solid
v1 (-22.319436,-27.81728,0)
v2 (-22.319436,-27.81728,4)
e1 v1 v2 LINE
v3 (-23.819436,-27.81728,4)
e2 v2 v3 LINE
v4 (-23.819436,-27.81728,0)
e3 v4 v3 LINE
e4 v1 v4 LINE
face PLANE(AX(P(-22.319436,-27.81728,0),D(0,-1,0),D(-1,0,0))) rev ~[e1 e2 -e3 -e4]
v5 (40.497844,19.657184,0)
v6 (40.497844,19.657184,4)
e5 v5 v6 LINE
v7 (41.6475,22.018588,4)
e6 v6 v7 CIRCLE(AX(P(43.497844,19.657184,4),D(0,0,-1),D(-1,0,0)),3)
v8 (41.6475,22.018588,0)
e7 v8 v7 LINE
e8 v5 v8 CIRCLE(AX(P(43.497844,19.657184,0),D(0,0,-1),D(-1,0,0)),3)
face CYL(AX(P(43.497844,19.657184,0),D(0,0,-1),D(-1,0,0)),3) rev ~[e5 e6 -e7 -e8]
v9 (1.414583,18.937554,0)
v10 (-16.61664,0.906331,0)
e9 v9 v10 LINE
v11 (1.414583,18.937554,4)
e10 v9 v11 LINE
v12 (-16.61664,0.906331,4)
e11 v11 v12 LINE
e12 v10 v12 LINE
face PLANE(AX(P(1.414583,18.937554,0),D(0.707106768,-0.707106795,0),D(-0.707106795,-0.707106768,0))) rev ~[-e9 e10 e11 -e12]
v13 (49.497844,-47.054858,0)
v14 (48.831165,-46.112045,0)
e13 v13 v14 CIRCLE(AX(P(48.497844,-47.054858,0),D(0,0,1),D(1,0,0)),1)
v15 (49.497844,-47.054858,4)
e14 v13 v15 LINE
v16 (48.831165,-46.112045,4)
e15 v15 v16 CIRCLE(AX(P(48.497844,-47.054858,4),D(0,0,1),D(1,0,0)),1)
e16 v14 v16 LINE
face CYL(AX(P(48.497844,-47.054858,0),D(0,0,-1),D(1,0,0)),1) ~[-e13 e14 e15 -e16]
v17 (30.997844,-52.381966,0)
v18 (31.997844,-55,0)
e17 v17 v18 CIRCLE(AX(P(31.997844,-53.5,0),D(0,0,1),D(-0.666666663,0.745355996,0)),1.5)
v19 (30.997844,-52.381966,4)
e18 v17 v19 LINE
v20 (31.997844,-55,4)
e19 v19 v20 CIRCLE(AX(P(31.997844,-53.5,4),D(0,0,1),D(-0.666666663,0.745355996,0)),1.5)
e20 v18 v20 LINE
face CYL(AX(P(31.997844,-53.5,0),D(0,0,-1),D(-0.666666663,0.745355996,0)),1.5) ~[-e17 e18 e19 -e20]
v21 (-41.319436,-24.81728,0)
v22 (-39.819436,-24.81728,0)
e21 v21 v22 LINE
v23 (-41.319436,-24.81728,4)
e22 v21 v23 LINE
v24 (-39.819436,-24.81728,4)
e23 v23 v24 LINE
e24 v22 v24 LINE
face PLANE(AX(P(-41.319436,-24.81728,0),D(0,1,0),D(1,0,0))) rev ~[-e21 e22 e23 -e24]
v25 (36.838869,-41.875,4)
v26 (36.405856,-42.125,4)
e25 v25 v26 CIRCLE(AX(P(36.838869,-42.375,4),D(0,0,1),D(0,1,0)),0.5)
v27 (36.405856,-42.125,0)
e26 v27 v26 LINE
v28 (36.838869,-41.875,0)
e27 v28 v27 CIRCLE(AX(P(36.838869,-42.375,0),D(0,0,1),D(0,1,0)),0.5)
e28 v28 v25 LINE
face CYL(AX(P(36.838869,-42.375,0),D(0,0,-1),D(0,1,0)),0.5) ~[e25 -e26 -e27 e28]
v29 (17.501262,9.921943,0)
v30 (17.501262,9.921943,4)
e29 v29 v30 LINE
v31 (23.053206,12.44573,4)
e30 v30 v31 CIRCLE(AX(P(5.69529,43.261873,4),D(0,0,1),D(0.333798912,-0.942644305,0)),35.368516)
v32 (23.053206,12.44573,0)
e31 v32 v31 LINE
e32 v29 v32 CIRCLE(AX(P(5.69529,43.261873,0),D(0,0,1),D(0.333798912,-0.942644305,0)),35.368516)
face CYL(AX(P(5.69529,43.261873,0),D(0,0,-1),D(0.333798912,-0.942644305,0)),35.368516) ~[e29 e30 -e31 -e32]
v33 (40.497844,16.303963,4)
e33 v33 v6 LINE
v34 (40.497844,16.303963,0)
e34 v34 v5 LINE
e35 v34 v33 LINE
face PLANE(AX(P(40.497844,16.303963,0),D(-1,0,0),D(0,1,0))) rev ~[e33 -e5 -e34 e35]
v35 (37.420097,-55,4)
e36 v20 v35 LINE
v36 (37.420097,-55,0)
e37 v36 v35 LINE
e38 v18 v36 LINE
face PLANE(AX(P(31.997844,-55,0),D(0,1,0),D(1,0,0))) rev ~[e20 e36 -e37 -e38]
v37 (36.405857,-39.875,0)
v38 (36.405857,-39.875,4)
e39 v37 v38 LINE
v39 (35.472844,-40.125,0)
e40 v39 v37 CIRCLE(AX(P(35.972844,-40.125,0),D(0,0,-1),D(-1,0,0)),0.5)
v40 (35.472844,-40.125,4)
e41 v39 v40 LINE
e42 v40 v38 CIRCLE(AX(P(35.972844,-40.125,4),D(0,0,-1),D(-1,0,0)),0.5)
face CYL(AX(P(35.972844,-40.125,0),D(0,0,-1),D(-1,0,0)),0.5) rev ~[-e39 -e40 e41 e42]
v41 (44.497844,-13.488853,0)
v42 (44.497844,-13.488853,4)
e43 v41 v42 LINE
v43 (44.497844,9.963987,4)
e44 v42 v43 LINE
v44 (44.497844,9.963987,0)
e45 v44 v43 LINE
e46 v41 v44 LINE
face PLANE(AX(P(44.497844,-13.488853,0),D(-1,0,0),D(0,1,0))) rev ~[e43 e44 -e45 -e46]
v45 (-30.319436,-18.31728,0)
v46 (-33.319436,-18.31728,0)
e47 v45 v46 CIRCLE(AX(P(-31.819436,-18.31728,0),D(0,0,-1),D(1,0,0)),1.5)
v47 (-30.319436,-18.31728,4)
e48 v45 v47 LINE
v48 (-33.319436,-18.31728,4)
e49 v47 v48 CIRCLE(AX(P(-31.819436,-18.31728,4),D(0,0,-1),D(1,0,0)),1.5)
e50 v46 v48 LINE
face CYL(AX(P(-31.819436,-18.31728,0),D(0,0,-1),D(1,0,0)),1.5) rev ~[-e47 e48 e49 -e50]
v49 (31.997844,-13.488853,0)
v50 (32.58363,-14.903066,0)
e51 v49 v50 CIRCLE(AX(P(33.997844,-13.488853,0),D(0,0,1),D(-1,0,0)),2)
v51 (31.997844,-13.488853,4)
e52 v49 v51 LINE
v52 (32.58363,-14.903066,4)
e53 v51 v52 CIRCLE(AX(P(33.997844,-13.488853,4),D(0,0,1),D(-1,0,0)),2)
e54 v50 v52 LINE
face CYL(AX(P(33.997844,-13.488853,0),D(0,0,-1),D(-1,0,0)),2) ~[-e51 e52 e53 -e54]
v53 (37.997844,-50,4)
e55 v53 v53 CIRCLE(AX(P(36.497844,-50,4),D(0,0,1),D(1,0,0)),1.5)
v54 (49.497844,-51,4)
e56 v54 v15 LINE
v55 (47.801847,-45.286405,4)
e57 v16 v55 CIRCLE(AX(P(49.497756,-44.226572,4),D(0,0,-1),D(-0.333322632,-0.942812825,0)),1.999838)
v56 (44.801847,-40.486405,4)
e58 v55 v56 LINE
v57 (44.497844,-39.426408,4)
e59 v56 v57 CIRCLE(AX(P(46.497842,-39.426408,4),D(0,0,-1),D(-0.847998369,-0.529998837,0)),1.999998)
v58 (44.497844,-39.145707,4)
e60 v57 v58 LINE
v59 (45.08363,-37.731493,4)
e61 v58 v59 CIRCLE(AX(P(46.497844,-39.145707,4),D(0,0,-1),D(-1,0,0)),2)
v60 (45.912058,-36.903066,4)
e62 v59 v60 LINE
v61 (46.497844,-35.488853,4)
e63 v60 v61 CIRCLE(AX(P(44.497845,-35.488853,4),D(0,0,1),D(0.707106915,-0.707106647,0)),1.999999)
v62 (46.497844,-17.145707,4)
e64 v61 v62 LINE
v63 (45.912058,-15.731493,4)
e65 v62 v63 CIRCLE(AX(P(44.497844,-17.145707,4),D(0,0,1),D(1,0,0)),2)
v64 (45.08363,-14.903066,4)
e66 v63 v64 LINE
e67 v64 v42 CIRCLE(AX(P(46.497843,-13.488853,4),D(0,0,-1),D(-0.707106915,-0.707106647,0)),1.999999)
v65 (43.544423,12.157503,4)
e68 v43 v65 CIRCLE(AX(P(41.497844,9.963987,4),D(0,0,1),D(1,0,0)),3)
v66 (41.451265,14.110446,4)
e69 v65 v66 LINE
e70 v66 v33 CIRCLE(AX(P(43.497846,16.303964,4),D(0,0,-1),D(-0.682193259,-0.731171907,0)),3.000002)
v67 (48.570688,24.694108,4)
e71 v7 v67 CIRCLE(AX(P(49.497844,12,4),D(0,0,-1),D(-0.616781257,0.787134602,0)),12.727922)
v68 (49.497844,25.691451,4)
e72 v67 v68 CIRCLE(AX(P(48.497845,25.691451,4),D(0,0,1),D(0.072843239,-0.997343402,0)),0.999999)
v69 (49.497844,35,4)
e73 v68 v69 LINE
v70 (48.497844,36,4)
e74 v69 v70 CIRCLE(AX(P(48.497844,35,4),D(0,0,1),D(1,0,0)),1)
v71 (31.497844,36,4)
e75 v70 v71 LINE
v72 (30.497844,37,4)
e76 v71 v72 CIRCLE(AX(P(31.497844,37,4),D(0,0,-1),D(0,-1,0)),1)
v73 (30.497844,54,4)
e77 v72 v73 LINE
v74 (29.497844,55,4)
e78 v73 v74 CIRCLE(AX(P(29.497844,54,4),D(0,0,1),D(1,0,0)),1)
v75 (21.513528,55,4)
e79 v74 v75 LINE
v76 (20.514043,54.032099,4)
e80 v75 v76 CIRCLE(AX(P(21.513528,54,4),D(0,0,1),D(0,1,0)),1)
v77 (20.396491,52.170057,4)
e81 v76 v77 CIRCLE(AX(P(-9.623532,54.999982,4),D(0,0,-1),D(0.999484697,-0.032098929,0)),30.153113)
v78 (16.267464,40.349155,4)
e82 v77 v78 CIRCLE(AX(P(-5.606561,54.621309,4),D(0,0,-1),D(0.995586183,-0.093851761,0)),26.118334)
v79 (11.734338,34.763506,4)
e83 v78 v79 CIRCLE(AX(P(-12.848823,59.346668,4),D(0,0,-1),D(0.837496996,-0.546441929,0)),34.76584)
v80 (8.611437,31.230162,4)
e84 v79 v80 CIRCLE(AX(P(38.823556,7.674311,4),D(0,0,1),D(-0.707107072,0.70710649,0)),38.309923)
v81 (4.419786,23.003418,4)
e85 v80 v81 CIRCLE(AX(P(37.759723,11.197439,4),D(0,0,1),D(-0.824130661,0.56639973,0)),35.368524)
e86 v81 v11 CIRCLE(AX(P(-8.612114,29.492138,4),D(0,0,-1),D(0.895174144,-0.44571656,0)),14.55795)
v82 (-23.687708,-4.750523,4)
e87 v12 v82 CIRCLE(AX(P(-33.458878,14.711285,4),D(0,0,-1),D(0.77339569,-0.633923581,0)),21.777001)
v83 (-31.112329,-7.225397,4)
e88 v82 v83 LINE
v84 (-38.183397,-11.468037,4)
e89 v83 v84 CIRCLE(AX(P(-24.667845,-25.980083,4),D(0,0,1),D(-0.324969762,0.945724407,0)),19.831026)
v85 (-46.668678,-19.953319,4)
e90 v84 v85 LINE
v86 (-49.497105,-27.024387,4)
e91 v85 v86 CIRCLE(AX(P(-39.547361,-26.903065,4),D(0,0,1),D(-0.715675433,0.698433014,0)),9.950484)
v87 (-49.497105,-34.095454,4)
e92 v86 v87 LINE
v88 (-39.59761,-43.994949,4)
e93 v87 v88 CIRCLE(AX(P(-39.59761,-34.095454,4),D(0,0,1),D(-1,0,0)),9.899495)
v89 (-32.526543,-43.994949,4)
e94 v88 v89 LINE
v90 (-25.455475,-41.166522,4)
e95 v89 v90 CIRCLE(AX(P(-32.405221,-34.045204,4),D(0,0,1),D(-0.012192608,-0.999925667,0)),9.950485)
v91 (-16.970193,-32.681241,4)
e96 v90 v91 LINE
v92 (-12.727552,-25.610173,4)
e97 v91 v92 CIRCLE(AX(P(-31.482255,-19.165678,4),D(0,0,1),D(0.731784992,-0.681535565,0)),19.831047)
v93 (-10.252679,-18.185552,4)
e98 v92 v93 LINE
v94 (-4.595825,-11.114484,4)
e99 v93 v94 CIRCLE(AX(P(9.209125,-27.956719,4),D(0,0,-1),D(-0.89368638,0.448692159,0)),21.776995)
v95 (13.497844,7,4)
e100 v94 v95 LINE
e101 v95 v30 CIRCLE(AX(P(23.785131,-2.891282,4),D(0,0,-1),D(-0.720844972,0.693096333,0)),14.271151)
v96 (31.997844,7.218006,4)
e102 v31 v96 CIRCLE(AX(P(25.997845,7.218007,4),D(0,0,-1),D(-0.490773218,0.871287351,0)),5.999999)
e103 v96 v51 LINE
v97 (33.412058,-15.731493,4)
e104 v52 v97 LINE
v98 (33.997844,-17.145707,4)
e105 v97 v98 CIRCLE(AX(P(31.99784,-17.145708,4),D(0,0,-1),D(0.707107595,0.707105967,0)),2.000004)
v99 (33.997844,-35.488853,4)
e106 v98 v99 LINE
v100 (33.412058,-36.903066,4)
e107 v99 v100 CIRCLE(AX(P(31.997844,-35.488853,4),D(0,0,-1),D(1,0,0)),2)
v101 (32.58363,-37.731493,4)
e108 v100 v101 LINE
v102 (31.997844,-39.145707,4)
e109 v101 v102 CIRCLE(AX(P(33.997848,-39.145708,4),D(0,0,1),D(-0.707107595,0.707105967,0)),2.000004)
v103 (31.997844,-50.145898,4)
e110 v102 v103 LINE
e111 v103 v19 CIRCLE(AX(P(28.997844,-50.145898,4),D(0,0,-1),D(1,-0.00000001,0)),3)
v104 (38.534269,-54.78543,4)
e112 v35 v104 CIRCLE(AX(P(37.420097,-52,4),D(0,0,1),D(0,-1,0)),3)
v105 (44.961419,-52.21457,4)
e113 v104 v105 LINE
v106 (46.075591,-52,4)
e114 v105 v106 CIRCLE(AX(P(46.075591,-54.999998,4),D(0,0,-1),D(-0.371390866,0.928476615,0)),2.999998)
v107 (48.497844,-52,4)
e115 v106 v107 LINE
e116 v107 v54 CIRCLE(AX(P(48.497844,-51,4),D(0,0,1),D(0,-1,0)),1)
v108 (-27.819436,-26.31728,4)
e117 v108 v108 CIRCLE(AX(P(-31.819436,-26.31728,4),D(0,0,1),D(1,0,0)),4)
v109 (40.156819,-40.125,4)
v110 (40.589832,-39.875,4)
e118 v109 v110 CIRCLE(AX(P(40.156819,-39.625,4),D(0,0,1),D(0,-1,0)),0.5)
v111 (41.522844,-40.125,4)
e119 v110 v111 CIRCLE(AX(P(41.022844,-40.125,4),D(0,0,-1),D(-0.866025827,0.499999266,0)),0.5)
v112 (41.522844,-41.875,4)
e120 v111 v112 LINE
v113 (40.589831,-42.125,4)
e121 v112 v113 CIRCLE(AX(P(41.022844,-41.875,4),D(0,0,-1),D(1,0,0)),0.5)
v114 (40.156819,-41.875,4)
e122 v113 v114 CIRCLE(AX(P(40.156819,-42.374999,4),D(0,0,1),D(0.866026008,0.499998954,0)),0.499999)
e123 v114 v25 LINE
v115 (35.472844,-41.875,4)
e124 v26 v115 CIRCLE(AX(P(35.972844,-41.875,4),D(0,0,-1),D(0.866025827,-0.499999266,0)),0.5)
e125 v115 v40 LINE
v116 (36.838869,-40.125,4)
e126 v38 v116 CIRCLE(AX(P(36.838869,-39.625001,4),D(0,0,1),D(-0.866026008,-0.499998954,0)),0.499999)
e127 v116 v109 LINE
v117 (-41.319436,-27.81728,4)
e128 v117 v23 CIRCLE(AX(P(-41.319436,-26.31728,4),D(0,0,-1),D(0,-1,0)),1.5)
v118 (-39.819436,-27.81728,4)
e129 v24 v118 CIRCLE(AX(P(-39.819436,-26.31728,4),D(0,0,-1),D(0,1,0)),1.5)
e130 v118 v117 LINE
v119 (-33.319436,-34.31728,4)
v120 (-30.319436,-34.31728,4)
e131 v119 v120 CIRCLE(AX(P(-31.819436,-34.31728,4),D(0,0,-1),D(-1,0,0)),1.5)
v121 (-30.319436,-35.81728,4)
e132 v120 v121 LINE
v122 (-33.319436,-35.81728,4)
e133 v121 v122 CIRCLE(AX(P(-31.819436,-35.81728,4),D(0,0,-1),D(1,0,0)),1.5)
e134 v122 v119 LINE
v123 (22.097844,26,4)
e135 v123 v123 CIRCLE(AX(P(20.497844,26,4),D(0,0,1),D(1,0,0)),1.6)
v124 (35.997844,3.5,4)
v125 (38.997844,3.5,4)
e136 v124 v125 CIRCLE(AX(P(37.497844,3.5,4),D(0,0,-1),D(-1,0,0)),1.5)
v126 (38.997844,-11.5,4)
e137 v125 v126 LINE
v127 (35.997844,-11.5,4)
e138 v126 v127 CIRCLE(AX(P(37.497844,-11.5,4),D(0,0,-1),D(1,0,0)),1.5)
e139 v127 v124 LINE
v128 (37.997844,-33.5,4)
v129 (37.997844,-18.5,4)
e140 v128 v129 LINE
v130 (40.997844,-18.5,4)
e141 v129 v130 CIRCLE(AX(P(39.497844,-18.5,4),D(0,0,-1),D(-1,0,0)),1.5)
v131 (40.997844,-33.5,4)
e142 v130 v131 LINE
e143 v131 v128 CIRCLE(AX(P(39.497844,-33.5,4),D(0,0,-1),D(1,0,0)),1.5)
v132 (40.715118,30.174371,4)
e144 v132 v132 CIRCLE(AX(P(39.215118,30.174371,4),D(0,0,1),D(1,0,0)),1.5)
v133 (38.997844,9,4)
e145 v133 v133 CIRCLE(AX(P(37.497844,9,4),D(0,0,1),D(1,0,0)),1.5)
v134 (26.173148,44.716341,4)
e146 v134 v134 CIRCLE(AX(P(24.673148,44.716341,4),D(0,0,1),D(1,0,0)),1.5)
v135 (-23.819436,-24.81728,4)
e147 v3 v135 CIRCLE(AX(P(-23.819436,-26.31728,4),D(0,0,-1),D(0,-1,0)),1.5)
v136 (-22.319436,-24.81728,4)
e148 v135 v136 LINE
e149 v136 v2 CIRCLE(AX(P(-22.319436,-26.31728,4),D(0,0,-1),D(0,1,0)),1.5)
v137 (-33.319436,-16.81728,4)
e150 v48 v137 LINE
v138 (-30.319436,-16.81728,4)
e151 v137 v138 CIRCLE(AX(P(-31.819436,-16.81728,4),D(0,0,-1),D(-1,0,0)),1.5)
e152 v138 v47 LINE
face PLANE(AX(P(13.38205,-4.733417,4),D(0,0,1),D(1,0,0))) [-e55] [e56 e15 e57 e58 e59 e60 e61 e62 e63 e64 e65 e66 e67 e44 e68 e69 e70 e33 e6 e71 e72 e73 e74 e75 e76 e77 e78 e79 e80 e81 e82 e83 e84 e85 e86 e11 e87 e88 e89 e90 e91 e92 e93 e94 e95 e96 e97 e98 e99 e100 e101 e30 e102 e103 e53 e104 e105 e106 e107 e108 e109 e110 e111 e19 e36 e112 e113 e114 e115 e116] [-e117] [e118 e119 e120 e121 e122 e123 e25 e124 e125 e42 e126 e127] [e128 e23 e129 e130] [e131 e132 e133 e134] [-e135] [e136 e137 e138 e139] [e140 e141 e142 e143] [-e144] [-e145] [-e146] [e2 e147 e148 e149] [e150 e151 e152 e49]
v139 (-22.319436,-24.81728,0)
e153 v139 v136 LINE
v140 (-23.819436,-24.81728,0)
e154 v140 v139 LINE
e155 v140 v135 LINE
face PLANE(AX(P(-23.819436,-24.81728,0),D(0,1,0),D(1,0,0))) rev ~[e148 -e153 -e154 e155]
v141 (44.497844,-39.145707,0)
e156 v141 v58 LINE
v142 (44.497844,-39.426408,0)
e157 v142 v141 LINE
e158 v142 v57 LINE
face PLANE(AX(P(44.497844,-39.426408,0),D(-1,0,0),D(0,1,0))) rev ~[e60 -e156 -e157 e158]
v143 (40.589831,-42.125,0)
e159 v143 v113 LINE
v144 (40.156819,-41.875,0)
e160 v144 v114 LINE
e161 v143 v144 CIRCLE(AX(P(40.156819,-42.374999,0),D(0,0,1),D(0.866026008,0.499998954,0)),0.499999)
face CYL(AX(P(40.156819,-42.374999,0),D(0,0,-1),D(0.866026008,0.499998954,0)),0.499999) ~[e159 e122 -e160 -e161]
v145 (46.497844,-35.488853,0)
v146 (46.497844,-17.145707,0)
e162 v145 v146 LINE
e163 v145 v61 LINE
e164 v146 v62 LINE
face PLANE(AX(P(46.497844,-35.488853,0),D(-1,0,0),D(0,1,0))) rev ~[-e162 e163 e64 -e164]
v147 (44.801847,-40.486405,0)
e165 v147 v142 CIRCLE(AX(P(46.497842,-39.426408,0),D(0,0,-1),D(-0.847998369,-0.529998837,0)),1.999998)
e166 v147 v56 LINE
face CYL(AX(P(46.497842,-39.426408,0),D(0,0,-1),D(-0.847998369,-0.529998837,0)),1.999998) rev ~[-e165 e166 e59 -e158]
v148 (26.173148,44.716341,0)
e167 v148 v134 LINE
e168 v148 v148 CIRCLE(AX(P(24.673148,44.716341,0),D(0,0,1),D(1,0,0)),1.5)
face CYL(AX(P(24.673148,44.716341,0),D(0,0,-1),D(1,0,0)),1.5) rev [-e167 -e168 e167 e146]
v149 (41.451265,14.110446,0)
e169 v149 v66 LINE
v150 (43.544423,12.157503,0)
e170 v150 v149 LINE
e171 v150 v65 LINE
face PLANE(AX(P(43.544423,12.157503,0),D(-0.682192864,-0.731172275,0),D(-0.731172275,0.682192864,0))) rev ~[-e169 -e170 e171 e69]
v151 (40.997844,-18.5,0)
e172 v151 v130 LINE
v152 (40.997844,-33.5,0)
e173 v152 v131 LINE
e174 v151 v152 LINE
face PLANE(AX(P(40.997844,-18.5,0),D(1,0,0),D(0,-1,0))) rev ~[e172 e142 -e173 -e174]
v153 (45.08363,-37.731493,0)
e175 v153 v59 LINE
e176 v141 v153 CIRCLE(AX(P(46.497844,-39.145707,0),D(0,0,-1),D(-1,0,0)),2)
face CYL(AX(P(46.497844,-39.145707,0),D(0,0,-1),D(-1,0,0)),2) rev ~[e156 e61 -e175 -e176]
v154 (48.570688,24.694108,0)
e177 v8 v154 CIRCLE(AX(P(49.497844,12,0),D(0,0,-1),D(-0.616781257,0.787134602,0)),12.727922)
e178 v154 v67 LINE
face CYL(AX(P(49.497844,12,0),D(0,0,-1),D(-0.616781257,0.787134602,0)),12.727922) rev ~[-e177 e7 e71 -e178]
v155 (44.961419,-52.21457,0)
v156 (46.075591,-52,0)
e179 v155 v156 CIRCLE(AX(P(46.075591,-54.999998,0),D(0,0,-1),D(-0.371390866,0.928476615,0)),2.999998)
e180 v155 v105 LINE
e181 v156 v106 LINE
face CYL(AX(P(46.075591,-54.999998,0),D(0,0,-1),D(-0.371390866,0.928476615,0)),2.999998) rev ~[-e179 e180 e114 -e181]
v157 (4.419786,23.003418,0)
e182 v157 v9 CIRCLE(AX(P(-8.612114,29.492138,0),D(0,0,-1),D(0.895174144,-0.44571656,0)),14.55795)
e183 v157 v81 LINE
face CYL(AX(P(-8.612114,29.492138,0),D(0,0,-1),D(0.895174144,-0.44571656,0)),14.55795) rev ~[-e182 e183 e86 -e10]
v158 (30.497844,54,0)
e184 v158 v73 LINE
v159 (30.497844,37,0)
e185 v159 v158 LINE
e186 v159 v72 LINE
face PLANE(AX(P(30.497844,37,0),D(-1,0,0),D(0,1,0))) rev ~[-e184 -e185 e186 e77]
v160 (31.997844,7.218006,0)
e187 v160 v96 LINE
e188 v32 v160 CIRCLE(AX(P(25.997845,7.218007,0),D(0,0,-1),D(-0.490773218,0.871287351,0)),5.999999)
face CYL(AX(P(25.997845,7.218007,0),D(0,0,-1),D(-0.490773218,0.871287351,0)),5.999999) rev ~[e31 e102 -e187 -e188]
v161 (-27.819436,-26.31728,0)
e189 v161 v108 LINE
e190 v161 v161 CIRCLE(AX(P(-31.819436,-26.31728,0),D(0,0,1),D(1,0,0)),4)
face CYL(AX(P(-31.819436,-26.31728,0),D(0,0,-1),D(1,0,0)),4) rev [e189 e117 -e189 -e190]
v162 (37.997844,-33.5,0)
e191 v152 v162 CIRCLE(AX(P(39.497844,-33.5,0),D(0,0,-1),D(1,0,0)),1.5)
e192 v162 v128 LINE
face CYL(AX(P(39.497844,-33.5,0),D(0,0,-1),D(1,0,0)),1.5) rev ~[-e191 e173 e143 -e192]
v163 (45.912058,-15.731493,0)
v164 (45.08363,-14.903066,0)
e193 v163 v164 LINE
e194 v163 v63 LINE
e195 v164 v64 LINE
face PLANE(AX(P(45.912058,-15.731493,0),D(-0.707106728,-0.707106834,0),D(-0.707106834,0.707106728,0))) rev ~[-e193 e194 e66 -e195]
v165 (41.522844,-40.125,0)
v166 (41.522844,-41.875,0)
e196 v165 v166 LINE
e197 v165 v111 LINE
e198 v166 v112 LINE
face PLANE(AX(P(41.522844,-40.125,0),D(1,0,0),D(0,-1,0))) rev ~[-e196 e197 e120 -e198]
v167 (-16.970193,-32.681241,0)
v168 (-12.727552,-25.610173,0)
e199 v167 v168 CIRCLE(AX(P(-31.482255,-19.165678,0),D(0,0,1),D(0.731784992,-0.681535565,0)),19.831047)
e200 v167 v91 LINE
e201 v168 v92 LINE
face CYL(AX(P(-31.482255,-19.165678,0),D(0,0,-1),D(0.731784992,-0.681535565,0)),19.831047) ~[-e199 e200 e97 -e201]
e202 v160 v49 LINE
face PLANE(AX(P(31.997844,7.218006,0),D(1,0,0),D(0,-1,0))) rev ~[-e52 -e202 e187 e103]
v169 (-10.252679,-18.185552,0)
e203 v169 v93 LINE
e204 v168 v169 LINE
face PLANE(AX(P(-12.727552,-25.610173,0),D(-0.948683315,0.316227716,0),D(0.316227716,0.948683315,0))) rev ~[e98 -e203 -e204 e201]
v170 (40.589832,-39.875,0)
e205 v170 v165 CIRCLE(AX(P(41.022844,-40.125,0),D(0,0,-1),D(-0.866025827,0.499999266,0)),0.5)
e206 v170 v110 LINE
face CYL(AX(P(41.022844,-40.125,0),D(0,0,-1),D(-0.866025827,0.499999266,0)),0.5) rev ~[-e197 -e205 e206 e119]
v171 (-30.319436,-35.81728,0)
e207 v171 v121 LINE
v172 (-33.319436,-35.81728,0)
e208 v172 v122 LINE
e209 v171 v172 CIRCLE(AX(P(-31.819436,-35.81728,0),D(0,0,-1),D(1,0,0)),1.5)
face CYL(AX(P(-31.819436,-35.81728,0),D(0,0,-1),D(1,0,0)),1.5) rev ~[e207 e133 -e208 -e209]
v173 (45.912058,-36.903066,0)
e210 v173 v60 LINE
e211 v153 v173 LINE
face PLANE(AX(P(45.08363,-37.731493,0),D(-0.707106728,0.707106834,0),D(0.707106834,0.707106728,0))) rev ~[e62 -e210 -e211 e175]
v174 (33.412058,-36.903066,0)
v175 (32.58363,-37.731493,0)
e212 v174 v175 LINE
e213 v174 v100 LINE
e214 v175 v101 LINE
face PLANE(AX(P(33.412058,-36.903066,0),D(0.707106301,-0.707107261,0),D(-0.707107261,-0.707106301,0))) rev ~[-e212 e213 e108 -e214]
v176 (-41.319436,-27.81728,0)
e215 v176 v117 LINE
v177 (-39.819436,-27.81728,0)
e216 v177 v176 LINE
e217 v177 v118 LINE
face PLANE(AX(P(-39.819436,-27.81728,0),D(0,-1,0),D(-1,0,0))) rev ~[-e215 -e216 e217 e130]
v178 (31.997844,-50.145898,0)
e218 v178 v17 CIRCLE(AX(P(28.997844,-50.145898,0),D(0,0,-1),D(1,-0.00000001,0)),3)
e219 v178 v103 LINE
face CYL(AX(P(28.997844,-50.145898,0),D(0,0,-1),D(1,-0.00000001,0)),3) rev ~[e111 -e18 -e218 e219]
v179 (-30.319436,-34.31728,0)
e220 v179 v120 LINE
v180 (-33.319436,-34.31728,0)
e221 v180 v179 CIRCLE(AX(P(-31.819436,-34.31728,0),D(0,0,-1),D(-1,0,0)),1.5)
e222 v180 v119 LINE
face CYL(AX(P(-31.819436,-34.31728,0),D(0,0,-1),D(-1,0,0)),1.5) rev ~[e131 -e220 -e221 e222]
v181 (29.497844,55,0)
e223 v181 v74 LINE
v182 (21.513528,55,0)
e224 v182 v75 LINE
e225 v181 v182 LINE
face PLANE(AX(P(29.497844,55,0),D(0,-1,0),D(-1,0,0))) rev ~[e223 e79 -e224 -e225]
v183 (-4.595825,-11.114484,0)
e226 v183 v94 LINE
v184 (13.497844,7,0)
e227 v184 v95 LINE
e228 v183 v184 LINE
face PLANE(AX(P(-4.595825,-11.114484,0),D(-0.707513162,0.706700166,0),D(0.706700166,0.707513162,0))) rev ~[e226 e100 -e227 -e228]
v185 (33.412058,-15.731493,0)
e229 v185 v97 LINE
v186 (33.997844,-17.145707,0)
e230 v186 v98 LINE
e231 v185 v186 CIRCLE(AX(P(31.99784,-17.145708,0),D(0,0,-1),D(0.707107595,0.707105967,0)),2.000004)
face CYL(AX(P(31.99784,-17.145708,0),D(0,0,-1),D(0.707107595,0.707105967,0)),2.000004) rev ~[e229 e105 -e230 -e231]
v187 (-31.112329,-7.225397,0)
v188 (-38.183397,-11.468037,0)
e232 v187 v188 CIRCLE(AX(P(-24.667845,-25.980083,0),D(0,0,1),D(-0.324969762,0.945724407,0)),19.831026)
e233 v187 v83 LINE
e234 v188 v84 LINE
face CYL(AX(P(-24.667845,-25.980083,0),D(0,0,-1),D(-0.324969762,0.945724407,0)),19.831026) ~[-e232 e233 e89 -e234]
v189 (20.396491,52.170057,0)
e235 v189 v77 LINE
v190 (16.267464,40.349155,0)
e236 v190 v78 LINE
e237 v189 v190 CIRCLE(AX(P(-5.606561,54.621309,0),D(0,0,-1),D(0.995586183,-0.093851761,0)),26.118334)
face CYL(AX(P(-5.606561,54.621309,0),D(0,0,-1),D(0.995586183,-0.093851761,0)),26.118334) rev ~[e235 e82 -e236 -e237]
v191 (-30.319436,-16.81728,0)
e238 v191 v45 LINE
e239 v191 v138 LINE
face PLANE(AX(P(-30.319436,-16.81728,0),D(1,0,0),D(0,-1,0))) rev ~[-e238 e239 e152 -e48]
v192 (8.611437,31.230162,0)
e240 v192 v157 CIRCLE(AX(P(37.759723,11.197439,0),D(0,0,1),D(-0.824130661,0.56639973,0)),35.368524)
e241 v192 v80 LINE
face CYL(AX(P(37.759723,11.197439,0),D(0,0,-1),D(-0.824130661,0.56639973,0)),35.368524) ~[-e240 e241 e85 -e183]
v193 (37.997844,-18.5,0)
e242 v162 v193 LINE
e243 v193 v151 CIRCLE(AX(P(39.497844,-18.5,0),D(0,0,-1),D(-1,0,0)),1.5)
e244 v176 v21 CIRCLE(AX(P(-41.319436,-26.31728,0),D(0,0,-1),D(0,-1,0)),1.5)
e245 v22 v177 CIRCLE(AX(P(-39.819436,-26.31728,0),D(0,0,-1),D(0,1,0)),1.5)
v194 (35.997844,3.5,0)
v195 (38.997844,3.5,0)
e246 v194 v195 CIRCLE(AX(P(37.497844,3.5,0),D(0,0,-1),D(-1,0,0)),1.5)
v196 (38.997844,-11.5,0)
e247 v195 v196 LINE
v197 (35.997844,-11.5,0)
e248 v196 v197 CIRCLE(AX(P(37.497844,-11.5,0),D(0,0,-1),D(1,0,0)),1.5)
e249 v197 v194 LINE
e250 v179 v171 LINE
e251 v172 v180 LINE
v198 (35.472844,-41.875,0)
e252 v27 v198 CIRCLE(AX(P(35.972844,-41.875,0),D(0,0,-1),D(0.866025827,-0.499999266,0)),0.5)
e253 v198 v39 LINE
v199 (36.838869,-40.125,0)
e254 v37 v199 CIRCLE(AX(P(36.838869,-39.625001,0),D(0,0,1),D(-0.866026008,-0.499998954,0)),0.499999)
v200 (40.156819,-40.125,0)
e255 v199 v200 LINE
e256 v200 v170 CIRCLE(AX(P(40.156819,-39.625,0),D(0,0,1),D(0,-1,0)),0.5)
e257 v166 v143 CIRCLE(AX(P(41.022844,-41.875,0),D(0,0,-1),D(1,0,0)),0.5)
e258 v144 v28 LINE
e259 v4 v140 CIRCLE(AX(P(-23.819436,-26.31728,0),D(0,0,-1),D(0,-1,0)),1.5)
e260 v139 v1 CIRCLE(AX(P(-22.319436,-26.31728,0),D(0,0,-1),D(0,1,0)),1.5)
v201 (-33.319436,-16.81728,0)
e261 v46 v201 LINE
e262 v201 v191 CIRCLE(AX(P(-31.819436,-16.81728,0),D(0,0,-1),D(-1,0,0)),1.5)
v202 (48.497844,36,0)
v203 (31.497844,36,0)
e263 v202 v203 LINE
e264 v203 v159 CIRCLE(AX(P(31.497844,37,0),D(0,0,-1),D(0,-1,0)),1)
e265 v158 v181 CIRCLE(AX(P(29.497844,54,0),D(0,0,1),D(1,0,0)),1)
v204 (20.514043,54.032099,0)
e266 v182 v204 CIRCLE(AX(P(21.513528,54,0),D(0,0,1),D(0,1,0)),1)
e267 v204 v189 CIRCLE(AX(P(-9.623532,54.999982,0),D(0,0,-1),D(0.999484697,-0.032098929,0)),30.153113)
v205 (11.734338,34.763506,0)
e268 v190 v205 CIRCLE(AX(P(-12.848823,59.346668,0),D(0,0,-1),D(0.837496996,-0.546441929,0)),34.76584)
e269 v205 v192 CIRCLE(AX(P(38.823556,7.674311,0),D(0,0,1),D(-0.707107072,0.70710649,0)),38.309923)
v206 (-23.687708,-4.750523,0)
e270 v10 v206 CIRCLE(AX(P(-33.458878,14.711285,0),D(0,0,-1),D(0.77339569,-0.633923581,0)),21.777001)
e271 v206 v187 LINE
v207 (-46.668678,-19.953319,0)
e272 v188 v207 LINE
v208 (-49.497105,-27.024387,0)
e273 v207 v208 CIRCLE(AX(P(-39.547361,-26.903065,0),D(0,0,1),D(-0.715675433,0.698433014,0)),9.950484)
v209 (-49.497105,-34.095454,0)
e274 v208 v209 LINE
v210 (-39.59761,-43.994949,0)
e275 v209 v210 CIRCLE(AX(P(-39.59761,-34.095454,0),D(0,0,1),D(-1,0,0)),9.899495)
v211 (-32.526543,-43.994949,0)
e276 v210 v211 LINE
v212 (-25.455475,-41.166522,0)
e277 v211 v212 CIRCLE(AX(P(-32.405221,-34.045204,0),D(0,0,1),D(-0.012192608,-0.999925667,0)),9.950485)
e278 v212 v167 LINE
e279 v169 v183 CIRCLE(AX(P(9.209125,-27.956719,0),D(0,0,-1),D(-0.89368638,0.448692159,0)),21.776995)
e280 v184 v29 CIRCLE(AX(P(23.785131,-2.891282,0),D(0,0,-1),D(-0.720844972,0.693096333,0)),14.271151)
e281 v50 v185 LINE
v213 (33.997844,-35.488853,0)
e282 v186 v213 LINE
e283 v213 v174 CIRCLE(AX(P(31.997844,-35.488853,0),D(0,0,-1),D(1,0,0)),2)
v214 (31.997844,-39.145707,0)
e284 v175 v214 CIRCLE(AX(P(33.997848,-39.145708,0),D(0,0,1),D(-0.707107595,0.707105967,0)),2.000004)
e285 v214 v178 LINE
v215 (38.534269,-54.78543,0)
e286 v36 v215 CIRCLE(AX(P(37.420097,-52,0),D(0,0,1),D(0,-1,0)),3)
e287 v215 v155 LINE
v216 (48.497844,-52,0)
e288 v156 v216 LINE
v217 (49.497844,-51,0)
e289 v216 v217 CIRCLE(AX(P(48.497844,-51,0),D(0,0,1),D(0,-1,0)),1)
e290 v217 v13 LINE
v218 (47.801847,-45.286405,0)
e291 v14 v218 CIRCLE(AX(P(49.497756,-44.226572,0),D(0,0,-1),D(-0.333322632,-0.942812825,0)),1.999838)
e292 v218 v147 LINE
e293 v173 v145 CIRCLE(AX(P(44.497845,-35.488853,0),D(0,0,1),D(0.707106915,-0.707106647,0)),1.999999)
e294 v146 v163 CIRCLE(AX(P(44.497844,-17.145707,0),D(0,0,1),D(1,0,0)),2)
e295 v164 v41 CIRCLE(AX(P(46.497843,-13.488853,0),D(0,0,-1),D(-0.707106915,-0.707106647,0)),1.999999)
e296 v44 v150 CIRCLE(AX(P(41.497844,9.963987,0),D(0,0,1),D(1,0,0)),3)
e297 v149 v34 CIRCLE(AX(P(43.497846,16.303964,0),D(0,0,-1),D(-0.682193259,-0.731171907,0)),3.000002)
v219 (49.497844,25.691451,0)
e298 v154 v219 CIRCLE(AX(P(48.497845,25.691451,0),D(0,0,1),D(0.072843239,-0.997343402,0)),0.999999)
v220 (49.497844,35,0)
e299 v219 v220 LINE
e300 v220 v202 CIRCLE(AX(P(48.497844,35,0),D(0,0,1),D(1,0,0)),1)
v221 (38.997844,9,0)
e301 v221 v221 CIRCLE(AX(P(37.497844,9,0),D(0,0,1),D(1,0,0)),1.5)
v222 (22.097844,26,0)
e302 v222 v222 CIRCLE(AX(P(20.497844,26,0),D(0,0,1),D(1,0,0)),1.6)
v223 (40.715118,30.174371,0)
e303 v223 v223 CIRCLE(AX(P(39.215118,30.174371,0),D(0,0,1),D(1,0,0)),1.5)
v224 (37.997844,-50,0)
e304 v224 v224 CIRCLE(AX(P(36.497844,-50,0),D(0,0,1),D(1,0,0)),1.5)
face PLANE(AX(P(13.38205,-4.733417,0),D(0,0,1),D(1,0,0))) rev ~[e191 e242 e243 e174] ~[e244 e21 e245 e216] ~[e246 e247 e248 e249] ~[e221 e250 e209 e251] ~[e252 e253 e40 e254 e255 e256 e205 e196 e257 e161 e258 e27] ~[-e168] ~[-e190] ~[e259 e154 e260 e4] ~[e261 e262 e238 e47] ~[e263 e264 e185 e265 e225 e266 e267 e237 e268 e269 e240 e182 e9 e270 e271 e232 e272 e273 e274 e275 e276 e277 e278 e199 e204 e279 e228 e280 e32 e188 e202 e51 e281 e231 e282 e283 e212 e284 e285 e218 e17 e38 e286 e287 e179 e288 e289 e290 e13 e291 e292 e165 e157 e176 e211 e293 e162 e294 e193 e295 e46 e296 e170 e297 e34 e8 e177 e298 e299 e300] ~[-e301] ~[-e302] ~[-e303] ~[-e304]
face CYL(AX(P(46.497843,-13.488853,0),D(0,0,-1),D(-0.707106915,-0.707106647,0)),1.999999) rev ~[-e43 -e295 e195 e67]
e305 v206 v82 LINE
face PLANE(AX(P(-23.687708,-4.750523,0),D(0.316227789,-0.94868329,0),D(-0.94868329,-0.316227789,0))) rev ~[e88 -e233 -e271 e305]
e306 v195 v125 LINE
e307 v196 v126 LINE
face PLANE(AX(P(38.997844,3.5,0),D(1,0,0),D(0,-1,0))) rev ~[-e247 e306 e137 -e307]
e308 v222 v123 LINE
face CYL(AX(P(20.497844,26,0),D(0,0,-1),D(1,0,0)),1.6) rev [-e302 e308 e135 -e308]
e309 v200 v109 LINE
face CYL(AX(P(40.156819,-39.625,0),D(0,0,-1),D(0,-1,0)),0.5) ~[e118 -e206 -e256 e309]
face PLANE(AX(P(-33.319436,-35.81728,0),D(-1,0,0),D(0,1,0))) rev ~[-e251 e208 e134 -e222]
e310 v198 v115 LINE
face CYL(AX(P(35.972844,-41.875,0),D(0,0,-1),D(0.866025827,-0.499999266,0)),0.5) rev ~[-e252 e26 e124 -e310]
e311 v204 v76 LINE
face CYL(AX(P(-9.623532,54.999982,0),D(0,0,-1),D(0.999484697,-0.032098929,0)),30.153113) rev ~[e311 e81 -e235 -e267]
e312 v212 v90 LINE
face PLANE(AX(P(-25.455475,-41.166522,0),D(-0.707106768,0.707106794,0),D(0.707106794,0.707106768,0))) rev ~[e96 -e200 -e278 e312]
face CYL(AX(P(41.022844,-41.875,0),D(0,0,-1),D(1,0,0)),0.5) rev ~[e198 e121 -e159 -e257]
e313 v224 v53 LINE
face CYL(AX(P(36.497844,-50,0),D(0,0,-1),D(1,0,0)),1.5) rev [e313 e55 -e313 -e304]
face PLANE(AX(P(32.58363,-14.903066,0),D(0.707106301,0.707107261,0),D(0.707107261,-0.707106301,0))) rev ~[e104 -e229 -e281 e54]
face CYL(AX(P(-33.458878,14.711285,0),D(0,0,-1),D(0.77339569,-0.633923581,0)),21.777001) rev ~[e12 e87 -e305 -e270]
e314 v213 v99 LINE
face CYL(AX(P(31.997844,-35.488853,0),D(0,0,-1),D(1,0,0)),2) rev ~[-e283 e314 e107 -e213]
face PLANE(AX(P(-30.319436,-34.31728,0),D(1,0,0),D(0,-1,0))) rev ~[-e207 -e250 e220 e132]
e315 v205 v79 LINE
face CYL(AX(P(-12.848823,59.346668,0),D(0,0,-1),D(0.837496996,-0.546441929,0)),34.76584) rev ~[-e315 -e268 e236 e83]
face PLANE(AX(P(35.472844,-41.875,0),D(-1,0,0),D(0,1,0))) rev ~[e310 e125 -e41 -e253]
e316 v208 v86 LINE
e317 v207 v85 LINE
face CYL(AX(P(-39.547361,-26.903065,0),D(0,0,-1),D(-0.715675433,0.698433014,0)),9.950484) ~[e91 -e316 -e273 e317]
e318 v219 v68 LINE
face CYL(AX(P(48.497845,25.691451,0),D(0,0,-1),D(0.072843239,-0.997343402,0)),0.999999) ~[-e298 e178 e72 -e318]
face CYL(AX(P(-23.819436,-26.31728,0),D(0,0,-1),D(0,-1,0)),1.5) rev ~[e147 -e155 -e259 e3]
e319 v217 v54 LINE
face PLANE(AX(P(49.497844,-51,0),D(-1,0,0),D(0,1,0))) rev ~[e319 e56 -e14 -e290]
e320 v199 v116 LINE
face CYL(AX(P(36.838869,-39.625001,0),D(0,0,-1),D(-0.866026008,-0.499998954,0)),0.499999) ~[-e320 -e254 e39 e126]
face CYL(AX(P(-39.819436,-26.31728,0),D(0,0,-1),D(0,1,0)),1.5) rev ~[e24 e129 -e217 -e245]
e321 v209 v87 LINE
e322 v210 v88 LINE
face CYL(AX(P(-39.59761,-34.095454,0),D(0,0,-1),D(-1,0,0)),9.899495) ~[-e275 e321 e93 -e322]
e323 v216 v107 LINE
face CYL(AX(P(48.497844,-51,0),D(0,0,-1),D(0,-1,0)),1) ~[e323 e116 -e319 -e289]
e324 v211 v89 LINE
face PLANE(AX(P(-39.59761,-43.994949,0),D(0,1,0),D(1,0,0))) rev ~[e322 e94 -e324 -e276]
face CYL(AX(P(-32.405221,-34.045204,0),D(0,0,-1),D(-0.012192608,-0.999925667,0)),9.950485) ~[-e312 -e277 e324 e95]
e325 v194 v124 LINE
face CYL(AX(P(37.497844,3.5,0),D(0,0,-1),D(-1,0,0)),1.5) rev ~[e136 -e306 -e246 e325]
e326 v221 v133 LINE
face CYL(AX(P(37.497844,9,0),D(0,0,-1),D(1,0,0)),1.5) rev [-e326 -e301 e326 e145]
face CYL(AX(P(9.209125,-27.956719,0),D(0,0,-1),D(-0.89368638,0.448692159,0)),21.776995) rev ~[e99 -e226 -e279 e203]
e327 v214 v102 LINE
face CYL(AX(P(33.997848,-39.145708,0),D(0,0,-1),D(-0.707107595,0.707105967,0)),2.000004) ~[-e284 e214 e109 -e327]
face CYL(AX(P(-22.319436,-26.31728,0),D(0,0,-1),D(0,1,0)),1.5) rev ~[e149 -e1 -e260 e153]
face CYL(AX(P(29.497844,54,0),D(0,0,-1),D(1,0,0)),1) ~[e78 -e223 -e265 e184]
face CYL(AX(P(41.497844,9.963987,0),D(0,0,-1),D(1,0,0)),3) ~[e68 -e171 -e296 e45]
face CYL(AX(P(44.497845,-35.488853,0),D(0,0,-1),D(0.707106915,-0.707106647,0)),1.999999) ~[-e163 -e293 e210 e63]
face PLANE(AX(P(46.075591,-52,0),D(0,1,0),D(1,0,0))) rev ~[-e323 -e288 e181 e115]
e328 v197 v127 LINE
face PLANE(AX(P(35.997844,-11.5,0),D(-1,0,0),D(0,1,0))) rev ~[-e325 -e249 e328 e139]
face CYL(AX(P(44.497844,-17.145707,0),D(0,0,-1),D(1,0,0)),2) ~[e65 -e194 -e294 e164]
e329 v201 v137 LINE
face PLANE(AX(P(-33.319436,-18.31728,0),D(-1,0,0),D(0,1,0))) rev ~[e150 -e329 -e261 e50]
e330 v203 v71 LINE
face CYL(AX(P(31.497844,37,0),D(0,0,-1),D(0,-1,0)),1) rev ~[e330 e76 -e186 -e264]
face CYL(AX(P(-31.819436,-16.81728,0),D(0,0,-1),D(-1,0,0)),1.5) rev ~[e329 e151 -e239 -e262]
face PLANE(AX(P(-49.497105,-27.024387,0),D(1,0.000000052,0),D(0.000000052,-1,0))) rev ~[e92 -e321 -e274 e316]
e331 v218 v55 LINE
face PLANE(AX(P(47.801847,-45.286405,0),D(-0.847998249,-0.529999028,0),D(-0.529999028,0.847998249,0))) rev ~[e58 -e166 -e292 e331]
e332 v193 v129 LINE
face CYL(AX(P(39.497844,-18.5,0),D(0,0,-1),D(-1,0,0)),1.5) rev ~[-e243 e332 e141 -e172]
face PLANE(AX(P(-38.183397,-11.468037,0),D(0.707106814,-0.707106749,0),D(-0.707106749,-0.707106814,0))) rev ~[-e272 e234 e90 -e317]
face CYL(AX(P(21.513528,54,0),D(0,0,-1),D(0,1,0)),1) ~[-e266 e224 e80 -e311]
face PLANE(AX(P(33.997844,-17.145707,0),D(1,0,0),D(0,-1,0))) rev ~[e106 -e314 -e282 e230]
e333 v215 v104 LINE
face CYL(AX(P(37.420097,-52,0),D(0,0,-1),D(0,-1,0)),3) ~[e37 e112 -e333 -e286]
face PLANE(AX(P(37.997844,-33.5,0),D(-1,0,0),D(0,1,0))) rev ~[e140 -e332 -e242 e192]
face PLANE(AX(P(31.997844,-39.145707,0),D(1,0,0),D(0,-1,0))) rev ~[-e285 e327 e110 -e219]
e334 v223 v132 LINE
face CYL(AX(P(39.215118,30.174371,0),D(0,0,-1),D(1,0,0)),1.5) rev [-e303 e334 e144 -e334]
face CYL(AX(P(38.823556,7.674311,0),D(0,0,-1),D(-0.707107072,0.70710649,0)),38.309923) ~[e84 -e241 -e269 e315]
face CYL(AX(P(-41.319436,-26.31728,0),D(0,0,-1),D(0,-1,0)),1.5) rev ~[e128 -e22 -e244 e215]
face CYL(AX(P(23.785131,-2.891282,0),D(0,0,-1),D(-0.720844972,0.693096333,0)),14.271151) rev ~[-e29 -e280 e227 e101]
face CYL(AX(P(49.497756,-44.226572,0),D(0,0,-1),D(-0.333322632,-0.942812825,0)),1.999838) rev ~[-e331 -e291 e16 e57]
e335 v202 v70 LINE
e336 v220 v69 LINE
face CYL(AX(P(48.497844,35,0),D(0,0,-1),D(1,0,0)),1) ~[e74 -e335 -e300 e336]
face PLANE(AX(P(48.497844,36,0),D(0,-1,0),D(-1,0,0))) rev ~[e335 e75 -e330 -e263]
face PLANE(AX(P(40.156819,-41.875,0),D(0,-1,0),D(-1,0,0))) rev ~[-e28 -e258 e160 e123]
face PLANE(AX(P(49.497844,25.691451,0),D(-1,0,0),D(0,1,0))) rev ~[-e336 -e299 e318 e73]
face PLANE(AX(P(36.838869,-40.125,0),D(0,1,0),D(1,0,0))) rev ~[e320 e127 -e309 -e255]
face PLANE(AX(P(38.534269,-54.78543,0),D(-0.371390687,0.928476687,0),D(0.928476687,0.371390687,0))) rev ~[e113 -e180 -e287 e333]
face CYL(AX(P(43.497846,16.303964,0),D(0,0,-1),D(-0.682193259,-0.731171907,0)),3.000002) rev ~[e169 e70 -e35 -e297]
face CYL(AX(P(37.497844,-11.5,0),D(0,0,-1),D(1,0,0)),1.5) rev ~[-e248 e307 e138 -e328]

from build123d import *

# Parameters (mm, degrees)
F0_R     = 4
F0_R_2   = 1.5
F0_R_3   = 1.6
F1_DEPTH = 4


# Not quite as in the source:
# - ends of sketch curves that miss each other by under 0.0002 mm in the source are joined


with BuildPart() as f1:
    # F0 (on Top) → F1 (new body)
    with BuildSketch(Plane.XY):
        with BuildLine():
            ThreePointArc((30.9978440056, -52.3819660063), (30.5965854602, -54.0352331312), (31.997844, -55))
            Line((31.997844, -55), (37.420097, -55))
            ThreePointArc((37.420097, -55), (37.9874195635, -54.9458691602), (38.5342690291, -54.7854300727))
            Line((38.5342690291, -54.7854300727), (44.961419, -52.21457))
            ThreePointArc((44.961419, -52.21457), (45.5082684365, -52.0541308398), (46.075591, -52))
            Line((46.075591, -52), (48.497844, -52))
            ThreePointArc((48.497844, -52), (49.2049507812, -51.7071067812), (49.497844, -51))
            Line((49.497844, -51), (49.497844, -47.054858))
            ThreePointArc((49.497844, -47.054858), (49.3143367471, -46.477502309), (48.8311648121, -46.1120445316))
            ThreePointArc((48.8311648121, -46.1120445316), (48.2464480359, -45.7865652768), (47.8018474974, -45.2864046891))
            Line((47.8018474974, -45.2864046891), (44.801847, -40.486405))
            ThreePointArc((44.801847, -40.486405), (44.5753463762, -39.9777725676), (44.497844, -39.426408))
            Line((44.497844, -39.426408), (44.497844, -39.145707))
            ThreePointArc((44.497844, -39.145707), (44.650084935, -38.3803401353), (45.0836304376, -37.7314934376))
            Line((45.0836304376, -37.7314934376), (45.912058, -36.903066))
            ThreePointArc((45.912058, -36.903066), (46.3456032003, -36.2542195381), (46.497844, -35.488853))
            Line((46.497844, -35.488853), (46.497844, -17.145707))
            ThreePointArc((46.497844, -17.145707), (46.345603065, -16.3803401353), (45.9120575624, -15.7314934376))
            Line((45.9120575624, -15.7314934376), (45.08363, -14.903066))
            ThreePointArc((45.08363, -14.903066), (44.6500847997, -14.2542195381), (44.497844, -13.488853))
            Line((44.497844, -13.488853), (44.497844, 9.963987))
            ThreePointArc((44.497844, 9.963987), (44.2491834617, 11.1598679166), (43.5444232222, 12.1575032382))
            Line((43.5444232222, 12.1575032382), (41.451265, 14.110446))
            ThreePointArc((41.451265, 14.110446), (40.7465046743, 15.1080817706), (40.497844, 16.303963))
            Line((40.497844, 16.303963), (40.497844, 19.657184))
            ThreePointArc((40.497844, 19.657184), (40.8005276064, 20.970380205), (41.6475001819, 22.0185877679))
            ThreePointArc((41.6475001819, 22.0185877679), (44.9097367641, 23.8722057946), (48.5706879935, 24.6941080891))
            ThreePointArc((48.5706879935, 24.6941080891), (49.2302523646, 25.0105853837), (49.497844, 25.691451))
            Line((49.497844, 25.691451), (49.497844, 35))
            ThreePointArc((49.497844, 35), (49.2049507812, 35.7071067812), (48.497844, 36))
            Line((48.497844, 36), (31.497844, 36))
            ThreePointArc((31.497844, 36), (30.7907372188, 36.2928932188), (30.497844, 37))
            Line((30.497844, 37), (30.497844, 54))
            ThreePointArc((30.497844, 54), (30.2049507812, 54.7071067812), (29.497844, 55))
            Line((29.497844, 55), (21.513528, 55))
            ThreePointArc((21.513528, 55), (20.8178624993, 54.7183658616), (20.5140433064, 54.0320990223))
            ThreePointArc((20.5140433064, 54.0320990223), (20.4696724232, 53.1001685974), (20.3964907955, 52.1700570193))
            ThreePointArc((20.3964907955, 52.1700570193), (19.0508324444, 46.0085107955), (16.2674640132, 40.3491549914))
            ThreePointArc((16.2674640132, 40.3491549914), (14.1457607442, 37.4387671742), (11.7343381171, 34.7635058829))
            ThreePointArc((11.7343381171, 34.7635058829), (10.1184707238, 33.0449295675), (8.6114374257, 31.2301616681))
            ThreePointArc((8.6114374257, 31.2301616681), (6.2460068014, 27.2541578949), (4.4197862212, 23.0034182758))
            ThreePointArc((4.4197862212, 23.0034182758), (3.0950438794, 20.8390250787), (1.4145833361, 18.9375536462))
            Line((1.4145833361, 18.9375536462), (-16.61664, 0.906331))
            ThreePointArc((-16.61664, 0.906331), (-19.8548943434, -2.2936956172), (-23.6877079435, -4.7505231125))
            Line((-23.6877079435, -4.7505231125), (-31.112329, -7.225397))
            ThreePointArc((-31.112329, -7.225397), (-34.8708228196, -8.9751171402), (-38.1833968947, -11.4680371131))
            Line((-38.1833968947, -11.4680371131), (-46.668678, -19.953319))
            ThreePointArc((-46.668678, -19.953319), (-48.7861533831, -23.2075482546), (-49.4971053712, -27.0243870045))
            Line((-49.4971053712, -27.0243870045), (-49.497105, -34.095454))
            ThreePointArc((-49.497105, -34.095454), (-46.5976100448, -41.0954540448), (-39.59761, -43.994949))
            Line((-39.59761, -43.994949), (-32.526543, -43.994949))
            ThreePointArc((-32.526543, -43.994949), (-28.7097042546, -43.2839973831), (-25.455474662, -41.1665223463))
            Line((-25.455474662, -41.1665223463), (-16.970193, -32.681241))
            ThreePointArc((-16.970193, -32.681241), (-14.4772731402, -29.3686668196), (-12.7275523092, -25.6101732374))
            Line((-12.7275523092, -25.6101732374), (-10.252679, -18.185552))
            ThreePointArc((-10.252679, -18.185552), (-7.7958516172, -14.3527383434), (-4.5958249273, -11.1144840887))
            Line((-4.5958249273, -11.1144840887), (13.497844, 7))
            ThreePointArc((13.497844, 7), (15.3717346163, 8.6360982299), (17.5012621548, 9.9219426844))
            ThreePointArc((17.5012621548, 9.9219426844), (20.331733184, 11.063946628), (23.0532060982, 12.4457298257))
            ThreePointArc((23.0532060982, 12.4457298257), (29.0253982797, 12.3981522415), (31.997844, 7.218006))
            Line((31.997844, 7.218006), (31.997844, -13.488853))
            ThreePointArc((31.997844, -13.488853), (32.1500847997, -14.2542195381), (32.5836299376, -14.9030660624))
            Line((32.5836299376, -14.9030660624), (33.412058, -15.731493))
            ThreePointArc((33.412058, -15.731493), (33.845603065, -16.3803401353), (33.997844, -17.145707))
            Line((33.997844, -17.145707), (33.997844, -35.488853))
            ThreePointArc((33.997844, -35.488853), (33.8456032003, -36.2542195381), (33.4120580624, -36.9030660624))
            Line((33.4120580624, -36.9030660624), (32.58363, -37.731493))
            ThreePointArc((32.58363, -37.731493), (32.150084935, -38.3803401353), (31.997844, -39.145707))
            Line((31.997844, -39.145707), (31.997844, -50.145898))
            ThreePointArc((31.997844, -50.145898), (31.7364567845, -51.3706428782), (30.9978440056, -52.3819660063))
        make_face()
        with BuildLine():
            ThreePointArc((-33.319436, -34.31728), (-31.819436, -32.81728), (-30.319436, -34.31728))
            Line((-30.319436, -34.31728), (-30.319436, -35.81728))
            ThreePointArc((-30.319436, -35.81728), (-31.819436, -37.31728), (-33.319436, -35.81728))
            Line((-33.319436, -35.81728), (-33.319436, -34.31728))
        make_face(mode=Mode.SUBTRACT)
        with BuildLine():
            ThreePointArc((-41.319436, -27.81728), (-42.819436, -26.31728), (-41.319436, -24.81728))
            Line((-41.319436, -24.81728), (-39.819436, -24.81728))
            ThreePointArc((-39.819436, -24.81728), (-38.319436, -26.31728), (-39.819436, -27.81728))
            Line((-39.819436, -27.81728), (-41.319436, -27.81728))
        make_face(mode=Mode.SUBTRACT)
        with Locations((-31.819436, -26.31728)):
            Circle(F0_R, mode=Mode.SUBTRACT)
        with BuildLine():
            ThreePointArc((-33.319436, -16.81728), (-31.819436, -15.31728), (-30.319436, -16.81728))
            Line((-30.319436, -16.81728), (-30.319436, -18.31728))
            ThreePointArc((-30.319436, -18.31728), (-31.819436, -19.81728), (-33.319436, -18.31728))
            Line((-33.319436, -18.31728), (-33.319436, -16.81728))
        make_face(mode=Mode.SUBTRACT)
        with BuildLine():
            ThreePointArc((-23.819436, -27.81728), (-25.319436, -26.31728), (-23.819436, -24.81728))
            Line((-23.819436, -24.81728), (-22.319436, -24.81728))
            ThreePointArc((-22.319436, -24.81728), (-20.819436, -26.31728), (-22.319436, -27.81728))
            Line((-22.319436, -27.81728), (-23.819436, -27.81728))
        make_face(mode=Mode.SUBTRACT)
        with Locations((36.497844, -50)):
            Circle(F0_R_2, mode=Mode.SUBTRACT)
        with BuildLine():
            Line((41.522844, -40.125), (41.522844, -41.875))
            ThreePointArc((41.522844, -41.875), (41.1522534506, -42.3579629324), (40.5898312236, -42.1249998709))
            ThreePointArc((40.5898312236, -42.1249998709), (40.406818848, -41.9419872104), (40.156819, -41.875))
            Line((40.156819, -41.875), (36.838869, -41.875))
            ThreePointArc((36.838869, -41.875), (36.588869152, -41.9419872104), (36.4058564736, -42.1249996961))
            ThreePointArc((36.4058564736, -42.1249996961), (35.8434345494, -42.3579629324), (35.472844, -41.875))
            Line((35.472844, -41.875), (35.472844, -40.125))
            ThreePointArc((35.472844, -40.125), (35.8434345494, -39.6420370676), (36.4058567764, -39.8750001291))
            ThreePointArc((36.4058567764, -39.8750001291), (36.588869152, -40.0580127896), (36.838869, -40.125))
            Line((36.838869, -40.125), (40.156819, -40.125))
            ThreePointArc((40.156819, -40.125), (40.406818848, -40.0580127896), (40.5898315264, -39.8750003039))
            ThreePointArc((40.5898315264, -39.8750003039), (41.1522534506, -39.6420370676), (41.522844, -40.125))
        make_face(mode=Mode.SUBTRACT)
        with BuildLine():
            Line((40.997844, -18.5), (40.997844, -33.5))
            ThreePointArc((40.997844, -33.5), (39.497844, -35), (37.997844, -33.5))
            Line((37.997844, -33.5), (37.997844, -18.5))
            ThreePointArc((37.997844, -18.5), (39.497844, -17), (40.997844, -18.5))
        make_face(mode=Mode.SUBTRACT)
        with BuildLine():
            Line((38.997844, 3.5), (38.997844, -11.5))
            ThreePointArc((38.997844, -11.5), (37.497844, -13), (35.997844, -11.5))
            Line((35.997844, -11.5), (35.997844, 3.5))
            ThreePointArc((35.997844, 3.5), (37.497844, 5), (38.997844, 3.5))
        make_face(mode=Mode.SUBTRACT)
        with Locations((20.497844, 26)):
            Circle(F0_R_3, mode=Mode.SUBTRACT)
        with Locations((37.497844, 9)):
            Circle(F0_R_2, mode=Mode.SUBTRACT)
        with Locations((24.673148, 44.716341)):
            Circle(F0_R_2, mode=Mode.SUBTRACT)
        with Locations((39.215118, 30.174371)):
            Circle(F0_R_2, mode=Mode.SUBTRACT)
    extrude(amount=F1_DEPTH)


solid = f1.part
